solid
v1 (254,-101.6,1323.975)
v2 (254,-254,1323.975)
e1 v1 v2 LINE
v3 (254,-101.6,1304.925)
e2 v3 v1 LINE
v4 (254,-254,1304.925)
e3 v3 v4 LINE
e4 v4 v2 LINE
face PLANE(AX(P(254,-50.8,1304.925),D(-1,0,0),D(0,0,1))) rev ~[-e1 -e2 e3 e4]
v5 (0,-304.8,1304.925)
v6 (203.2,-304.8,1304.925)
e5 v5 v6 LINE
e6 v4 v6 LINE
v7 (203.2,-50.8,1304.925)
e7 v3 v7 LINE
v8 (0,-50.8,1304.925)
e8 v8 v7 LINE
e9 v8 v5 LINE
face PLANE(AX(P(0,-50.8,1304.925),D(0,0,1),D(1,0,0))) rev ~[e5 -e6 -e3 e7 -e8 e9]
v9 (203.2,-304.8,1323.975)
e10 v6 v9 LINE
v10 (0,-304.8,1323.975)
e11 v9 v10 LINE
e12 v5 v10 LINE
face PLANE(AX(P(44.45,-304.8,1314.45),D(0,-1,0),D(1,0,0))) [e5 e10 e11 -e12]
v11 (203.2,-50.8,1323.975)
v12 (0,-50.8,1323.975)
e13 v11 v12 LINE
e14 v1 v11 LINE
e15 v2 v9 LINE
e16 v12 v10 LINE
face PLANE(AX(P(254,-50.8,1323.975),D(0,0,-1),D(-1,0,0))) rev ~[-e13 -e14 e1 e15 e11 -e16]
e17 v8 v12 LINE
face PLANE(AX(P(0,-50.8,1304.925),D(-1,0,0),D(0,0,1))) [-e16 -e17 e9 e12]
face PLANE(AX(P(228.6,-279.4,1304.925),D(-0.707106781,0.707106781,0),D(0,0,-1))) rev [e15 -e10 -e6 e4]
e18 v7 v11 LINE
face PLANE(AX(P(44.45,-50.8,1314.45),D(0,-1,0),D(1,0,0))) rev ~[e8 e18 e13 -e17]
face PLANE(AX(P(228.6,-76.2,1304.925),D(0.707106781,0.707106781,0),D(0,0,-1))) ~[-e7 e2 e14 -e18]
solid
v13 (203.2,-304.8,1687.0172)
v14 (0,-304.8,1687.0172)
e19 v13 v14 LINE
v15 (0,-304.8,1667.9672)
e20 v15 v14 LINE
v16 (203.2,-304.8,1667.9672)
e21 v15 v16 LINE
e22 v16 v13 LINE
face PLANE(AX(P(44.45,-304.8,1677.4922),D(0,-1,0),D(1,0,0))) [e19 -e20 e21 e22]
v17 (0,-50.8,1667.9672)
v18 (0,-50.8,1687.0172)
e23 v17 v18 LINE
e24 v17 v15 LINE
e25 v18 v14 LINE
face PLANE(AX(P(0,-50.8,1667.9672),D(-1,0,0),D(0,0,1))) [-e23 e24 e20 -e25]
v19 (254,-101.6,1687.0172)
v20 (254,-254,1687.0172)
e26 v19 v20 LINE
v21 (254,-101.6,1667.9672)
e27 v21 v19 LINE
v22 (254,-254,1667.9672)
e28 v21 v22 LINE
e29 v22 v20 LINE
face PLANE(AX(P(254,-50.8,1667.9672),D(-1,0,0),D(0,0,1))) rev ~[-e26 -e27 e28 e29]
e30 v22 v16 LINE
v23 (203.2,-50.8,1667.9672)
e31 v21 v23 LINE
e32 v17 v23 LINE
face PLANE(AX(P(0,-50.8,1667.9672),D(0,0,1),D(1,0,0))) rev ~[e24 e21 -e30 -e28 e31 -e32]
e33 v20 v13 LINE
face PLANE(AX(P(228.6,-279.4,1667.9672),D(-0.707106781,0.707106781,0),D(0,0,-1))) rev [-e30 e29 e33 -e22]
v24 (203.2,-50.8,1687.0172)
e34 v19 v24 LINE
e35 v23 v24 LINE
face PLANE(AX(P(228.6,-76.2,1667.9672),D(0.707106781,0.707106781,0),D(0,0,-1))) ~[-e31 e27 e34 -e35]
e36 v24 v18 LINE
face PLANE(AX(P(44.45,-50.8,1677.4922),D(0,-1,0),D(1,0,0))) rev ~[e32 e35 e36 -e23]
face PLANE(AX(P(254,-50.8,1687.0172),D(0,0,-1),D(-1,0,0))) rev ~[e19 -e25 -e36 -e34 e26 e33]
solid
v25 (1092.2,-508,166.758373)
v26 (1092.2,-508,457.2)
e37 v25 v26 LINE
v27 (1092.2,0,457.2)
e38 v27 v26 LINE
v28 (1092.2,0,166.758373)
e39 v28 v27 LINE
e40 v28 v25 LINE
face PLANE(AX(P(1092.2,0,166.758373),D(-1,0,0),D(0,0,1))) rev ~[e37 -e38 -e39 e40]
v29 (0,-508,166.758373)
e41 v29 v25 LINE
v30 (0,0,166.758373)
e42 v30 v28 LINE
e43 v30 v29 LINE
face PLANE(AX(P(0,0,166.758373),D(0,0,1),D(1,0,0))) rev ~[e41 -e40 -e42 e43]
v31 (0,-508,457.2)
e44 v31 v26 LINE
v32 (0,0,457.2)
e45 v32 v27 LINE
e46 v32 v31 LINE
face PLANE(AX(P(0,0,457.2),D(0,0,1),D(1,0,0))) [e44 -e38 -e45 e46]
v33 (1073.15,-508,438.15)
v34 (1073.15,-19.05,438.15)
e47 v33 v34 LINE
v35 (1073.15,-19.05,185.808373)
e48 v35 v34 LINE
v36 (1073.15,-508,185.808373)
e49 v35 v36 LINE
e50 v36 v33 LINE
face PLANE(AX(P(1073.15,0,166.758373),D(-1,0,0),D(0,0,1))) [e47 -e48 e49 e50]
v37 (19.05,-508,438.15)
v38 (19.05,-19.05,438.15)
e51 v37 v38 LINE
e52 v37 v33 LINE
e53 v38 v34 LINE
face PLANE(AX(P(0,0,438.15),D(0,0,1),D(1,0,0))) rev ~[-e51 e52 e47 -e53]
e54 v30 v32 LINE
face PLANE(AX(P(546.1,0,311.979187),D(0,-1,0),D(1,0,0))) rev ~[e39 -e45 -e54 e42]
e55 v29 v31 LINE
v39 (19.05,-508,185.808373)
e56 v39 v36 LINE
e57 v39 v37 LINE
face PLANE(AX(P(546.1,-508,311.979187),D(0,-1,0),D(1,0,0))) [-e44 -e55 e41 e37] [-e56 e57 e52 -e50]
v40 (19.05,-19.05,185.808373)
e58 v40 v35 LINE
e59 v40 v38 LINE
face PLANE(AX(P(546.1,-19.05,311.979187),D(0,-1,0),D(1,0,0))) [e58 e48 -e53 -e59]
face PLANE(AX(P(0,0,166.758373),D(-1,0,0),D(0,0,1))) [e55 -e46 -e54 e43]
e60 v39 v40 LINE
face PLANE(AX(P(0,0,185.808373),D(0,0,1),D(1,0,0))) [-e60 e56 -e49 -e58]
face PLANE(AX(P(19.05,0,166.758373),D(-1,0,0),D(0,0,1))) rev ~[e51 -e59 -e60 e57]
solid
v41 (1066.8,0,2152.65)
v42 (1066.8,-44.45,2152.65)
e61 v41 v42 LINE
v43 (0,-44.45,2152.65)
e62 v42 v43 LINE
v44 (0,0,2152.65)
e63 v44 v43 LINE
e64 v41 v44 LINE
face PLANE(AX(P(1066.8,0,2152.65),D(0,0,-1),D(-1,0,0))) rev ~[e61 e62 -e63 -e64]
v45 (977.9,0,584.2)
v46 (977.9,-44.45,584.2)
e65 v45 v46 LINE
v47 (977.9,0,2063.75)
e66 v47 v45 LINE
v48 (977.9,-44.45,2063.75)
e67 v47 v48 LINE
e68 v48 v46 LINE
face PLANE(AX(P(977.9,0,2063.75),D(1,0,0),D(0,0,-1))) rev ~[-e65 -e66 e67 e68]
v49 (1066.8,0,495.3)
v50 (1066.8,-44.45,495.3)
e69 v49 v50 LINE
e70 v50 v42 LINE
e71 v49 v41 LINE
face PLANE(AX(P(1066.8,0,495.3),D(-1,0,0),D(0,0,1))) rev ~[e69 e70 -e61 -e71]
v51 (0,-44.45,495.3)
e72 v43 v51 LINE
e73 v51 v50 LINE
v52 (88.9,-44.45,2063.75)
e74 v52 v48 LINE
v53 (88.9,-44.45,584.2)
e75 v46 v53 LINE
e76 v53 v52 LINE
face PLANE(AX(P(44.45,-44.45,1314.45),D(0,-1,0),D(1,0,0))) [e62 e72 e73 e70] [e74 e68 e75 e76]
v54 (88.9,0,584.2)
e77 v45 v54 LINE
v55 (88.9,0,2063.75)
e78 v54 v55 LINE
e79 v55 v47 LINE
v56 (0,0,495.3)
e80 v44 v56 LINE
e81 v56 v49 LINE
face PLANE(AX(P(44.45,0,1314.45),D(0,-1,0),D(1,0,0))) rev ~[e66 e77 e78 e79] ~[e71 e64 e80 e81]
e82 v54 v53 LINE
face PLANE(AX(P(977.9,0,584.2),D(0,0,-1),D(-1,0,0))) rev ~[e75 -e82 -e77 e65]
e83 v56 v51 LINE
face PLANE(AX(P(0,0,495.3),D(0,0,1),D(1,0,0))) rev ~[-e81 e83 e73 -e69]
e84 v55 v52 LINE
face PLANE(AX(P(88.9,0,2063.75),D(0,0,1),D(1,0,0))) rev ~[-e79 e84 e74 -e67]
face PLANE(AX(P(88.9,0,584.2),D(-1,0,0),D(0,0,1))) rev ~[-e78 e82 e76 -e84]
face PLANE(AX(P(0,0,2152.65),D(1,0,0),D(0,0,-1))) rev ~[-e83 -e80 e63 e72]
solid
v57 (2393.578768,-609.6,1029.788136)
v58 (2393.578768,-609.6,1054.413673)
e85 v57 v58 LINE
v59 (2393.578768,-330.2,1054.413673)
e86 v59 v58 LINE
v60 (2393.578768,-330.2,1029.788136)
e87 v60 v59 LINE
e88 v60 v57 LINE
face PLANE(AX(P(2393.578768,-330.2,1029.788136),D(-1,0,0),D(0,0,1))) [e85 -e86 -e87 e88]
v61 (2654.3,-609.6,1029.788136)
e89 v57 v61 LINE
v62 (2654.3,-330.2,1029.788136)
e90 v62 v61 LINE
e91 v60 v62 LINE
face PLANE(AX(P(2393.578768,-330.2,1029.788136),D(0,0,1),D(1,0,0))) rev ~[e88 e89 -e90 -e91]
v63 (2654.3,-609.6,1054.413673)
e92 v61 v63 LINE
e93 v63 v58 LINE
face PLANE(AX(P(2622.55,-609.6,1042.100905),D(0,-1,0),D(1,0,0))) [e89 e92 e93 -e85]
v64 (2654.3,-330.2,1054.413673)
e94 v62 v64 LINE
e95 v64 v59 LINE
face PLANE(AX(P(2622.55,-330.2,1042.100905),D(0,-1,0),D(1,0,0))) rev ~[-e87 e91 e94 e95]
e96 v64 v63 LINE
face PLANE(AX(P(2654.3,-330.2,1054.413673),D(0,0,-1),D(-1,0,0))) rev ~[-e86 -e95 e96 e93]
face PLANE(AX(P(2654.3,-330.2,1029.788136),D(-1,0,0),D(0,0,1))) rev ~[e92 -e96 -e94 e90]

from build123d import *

# Parameters (mm, degrees)
F0_W      = 1092.2
F0_H      = 290.4416266203
F1_DEPTH  = 508
F6_START  = 330.2
F0_W_2    = 63.5
F0_H_2    = 24.6255362988
F0_W_3    = 197.2212322235
F6_DEPTH  = 279.4
F7_START  = 50.8
F0_W_4    = 88.9
F0_H_3    = 19.05
F0_W_5    = 165.1
F7_DEPTH  = 254
F8_SIZE   = 50.8
F8_2_SIZE = 50.8
F0_H_4    = 343.9922002792
F9_DEPTH  = 44.45
F10_T     = -19.05


# Not quite as in the source:
# - the program builds the solid bodies; features that only make, move or delete a surface that nothing else refers to are left out


with BuildPart() as f1:
    # F0 (on Front) → F1 (new body)
    with BuildSketch(Plane.XZ):
        with Locations((546.1, 311.9791866899)):
            Rectangle(F0_W, F0_H)
    extrude(amount=F1_DEPTH)

    # F10
    f10_openings = [f1.faces().sort_by_distance(p)[0] for p in [
        (546.1, -508, 311.979187),
    ]]
    offset(amount=F10_T, openings=f10_openings)


with BuildPart() as f6:
    # F0 (on Front) → F6 (new body)
    with BuildSketch(Plane.XZ.offset(F6_START)):
        with Locations((2622.55, 1042.1009046316)):
            Rectangle(F0_W_2, F0_H_2)
        with Locations((2492.1893838882, 1042.1009046316)):
            Rectangle(F0_W_3, F0_H_2)
    extrude(amount=F6_DEPTH)


with BuildPart() as f7:
    # F0 (on Front) → F7 (new body)
    with BuildSketch(Plane.XZ.offset(F7_START)):
        with Locations((44.45, 1677.4922002792)):
            Rectangle(F0_W_4, F0_H_3)
        with Locations((171.45, 1677.4922002792)):
            Rectangle(F0_W_5, F0_H_3)
    extrude(amount=F7_DEPTH)

    # F8
    f8_edges = [f7.edges().sort_by_distance(p)[0] for p in [
        (254, -304.8, 1677.4922),
        (254, -50.8, 1677.4922),
    ]]
    chamfer(f8_edges, length=F8_SIZE)


with BuildPart() as f7b:
    # F0 (on Front) → F7, piece 2 (new body)
    with BuildSketch(Plane.XZ.offset(F7_START)):
        with Locations((44.45, 1314.45)):
            Rectangle(F0_W_4, F0_H_3)
        with Locations((171.45, 1314.45)):
            Rectangle(F0_W_5, F0_H_3)
    extrude(amount=F7_DEPTH)

    # F8#2
    f8_2_edges = [f7b.edges().sort_by_distance(p)[0] for p in [
        (254, -304.8, 1314.45),
        (254, -50.8, 1314.45),
    ]]
    chamfer(f8_2_edges, length=F8_2_SIZE)


with BuildPart() as f9:
    # F0 (on Front) → F9 (new body)
    with BuildSketch(Plane.XZ):
        with Locations((44.45, 1314.45)):
            Rectangle(F0_W_4, F0_H_3)
        with Locations((44.45, 1495.9711001396)):
            Rectangle(F0_W_4, F0_H_4)
        with Locations((44.45, 1677.4922002792)):
            Rectangle(F0_W_4, F0_H_3)
        Polygon((0, 1304.925), (0, 495.3), (1066.8, 495.3), (1066.8, 2152.65), (0, 2152.65), (0, 1687.0172002792), (88.9, 1687.0172002792), (88.9, 2063.75), (977.9, 2063.75), (977.9, 584.2), (88.9, 584.2), (88.9, 1304.925), align=None)
    extrude(amount=F9_DEPTH)


solid = Compound([f1.part, f6.part, f7.part, f7b.part, f9.part])
